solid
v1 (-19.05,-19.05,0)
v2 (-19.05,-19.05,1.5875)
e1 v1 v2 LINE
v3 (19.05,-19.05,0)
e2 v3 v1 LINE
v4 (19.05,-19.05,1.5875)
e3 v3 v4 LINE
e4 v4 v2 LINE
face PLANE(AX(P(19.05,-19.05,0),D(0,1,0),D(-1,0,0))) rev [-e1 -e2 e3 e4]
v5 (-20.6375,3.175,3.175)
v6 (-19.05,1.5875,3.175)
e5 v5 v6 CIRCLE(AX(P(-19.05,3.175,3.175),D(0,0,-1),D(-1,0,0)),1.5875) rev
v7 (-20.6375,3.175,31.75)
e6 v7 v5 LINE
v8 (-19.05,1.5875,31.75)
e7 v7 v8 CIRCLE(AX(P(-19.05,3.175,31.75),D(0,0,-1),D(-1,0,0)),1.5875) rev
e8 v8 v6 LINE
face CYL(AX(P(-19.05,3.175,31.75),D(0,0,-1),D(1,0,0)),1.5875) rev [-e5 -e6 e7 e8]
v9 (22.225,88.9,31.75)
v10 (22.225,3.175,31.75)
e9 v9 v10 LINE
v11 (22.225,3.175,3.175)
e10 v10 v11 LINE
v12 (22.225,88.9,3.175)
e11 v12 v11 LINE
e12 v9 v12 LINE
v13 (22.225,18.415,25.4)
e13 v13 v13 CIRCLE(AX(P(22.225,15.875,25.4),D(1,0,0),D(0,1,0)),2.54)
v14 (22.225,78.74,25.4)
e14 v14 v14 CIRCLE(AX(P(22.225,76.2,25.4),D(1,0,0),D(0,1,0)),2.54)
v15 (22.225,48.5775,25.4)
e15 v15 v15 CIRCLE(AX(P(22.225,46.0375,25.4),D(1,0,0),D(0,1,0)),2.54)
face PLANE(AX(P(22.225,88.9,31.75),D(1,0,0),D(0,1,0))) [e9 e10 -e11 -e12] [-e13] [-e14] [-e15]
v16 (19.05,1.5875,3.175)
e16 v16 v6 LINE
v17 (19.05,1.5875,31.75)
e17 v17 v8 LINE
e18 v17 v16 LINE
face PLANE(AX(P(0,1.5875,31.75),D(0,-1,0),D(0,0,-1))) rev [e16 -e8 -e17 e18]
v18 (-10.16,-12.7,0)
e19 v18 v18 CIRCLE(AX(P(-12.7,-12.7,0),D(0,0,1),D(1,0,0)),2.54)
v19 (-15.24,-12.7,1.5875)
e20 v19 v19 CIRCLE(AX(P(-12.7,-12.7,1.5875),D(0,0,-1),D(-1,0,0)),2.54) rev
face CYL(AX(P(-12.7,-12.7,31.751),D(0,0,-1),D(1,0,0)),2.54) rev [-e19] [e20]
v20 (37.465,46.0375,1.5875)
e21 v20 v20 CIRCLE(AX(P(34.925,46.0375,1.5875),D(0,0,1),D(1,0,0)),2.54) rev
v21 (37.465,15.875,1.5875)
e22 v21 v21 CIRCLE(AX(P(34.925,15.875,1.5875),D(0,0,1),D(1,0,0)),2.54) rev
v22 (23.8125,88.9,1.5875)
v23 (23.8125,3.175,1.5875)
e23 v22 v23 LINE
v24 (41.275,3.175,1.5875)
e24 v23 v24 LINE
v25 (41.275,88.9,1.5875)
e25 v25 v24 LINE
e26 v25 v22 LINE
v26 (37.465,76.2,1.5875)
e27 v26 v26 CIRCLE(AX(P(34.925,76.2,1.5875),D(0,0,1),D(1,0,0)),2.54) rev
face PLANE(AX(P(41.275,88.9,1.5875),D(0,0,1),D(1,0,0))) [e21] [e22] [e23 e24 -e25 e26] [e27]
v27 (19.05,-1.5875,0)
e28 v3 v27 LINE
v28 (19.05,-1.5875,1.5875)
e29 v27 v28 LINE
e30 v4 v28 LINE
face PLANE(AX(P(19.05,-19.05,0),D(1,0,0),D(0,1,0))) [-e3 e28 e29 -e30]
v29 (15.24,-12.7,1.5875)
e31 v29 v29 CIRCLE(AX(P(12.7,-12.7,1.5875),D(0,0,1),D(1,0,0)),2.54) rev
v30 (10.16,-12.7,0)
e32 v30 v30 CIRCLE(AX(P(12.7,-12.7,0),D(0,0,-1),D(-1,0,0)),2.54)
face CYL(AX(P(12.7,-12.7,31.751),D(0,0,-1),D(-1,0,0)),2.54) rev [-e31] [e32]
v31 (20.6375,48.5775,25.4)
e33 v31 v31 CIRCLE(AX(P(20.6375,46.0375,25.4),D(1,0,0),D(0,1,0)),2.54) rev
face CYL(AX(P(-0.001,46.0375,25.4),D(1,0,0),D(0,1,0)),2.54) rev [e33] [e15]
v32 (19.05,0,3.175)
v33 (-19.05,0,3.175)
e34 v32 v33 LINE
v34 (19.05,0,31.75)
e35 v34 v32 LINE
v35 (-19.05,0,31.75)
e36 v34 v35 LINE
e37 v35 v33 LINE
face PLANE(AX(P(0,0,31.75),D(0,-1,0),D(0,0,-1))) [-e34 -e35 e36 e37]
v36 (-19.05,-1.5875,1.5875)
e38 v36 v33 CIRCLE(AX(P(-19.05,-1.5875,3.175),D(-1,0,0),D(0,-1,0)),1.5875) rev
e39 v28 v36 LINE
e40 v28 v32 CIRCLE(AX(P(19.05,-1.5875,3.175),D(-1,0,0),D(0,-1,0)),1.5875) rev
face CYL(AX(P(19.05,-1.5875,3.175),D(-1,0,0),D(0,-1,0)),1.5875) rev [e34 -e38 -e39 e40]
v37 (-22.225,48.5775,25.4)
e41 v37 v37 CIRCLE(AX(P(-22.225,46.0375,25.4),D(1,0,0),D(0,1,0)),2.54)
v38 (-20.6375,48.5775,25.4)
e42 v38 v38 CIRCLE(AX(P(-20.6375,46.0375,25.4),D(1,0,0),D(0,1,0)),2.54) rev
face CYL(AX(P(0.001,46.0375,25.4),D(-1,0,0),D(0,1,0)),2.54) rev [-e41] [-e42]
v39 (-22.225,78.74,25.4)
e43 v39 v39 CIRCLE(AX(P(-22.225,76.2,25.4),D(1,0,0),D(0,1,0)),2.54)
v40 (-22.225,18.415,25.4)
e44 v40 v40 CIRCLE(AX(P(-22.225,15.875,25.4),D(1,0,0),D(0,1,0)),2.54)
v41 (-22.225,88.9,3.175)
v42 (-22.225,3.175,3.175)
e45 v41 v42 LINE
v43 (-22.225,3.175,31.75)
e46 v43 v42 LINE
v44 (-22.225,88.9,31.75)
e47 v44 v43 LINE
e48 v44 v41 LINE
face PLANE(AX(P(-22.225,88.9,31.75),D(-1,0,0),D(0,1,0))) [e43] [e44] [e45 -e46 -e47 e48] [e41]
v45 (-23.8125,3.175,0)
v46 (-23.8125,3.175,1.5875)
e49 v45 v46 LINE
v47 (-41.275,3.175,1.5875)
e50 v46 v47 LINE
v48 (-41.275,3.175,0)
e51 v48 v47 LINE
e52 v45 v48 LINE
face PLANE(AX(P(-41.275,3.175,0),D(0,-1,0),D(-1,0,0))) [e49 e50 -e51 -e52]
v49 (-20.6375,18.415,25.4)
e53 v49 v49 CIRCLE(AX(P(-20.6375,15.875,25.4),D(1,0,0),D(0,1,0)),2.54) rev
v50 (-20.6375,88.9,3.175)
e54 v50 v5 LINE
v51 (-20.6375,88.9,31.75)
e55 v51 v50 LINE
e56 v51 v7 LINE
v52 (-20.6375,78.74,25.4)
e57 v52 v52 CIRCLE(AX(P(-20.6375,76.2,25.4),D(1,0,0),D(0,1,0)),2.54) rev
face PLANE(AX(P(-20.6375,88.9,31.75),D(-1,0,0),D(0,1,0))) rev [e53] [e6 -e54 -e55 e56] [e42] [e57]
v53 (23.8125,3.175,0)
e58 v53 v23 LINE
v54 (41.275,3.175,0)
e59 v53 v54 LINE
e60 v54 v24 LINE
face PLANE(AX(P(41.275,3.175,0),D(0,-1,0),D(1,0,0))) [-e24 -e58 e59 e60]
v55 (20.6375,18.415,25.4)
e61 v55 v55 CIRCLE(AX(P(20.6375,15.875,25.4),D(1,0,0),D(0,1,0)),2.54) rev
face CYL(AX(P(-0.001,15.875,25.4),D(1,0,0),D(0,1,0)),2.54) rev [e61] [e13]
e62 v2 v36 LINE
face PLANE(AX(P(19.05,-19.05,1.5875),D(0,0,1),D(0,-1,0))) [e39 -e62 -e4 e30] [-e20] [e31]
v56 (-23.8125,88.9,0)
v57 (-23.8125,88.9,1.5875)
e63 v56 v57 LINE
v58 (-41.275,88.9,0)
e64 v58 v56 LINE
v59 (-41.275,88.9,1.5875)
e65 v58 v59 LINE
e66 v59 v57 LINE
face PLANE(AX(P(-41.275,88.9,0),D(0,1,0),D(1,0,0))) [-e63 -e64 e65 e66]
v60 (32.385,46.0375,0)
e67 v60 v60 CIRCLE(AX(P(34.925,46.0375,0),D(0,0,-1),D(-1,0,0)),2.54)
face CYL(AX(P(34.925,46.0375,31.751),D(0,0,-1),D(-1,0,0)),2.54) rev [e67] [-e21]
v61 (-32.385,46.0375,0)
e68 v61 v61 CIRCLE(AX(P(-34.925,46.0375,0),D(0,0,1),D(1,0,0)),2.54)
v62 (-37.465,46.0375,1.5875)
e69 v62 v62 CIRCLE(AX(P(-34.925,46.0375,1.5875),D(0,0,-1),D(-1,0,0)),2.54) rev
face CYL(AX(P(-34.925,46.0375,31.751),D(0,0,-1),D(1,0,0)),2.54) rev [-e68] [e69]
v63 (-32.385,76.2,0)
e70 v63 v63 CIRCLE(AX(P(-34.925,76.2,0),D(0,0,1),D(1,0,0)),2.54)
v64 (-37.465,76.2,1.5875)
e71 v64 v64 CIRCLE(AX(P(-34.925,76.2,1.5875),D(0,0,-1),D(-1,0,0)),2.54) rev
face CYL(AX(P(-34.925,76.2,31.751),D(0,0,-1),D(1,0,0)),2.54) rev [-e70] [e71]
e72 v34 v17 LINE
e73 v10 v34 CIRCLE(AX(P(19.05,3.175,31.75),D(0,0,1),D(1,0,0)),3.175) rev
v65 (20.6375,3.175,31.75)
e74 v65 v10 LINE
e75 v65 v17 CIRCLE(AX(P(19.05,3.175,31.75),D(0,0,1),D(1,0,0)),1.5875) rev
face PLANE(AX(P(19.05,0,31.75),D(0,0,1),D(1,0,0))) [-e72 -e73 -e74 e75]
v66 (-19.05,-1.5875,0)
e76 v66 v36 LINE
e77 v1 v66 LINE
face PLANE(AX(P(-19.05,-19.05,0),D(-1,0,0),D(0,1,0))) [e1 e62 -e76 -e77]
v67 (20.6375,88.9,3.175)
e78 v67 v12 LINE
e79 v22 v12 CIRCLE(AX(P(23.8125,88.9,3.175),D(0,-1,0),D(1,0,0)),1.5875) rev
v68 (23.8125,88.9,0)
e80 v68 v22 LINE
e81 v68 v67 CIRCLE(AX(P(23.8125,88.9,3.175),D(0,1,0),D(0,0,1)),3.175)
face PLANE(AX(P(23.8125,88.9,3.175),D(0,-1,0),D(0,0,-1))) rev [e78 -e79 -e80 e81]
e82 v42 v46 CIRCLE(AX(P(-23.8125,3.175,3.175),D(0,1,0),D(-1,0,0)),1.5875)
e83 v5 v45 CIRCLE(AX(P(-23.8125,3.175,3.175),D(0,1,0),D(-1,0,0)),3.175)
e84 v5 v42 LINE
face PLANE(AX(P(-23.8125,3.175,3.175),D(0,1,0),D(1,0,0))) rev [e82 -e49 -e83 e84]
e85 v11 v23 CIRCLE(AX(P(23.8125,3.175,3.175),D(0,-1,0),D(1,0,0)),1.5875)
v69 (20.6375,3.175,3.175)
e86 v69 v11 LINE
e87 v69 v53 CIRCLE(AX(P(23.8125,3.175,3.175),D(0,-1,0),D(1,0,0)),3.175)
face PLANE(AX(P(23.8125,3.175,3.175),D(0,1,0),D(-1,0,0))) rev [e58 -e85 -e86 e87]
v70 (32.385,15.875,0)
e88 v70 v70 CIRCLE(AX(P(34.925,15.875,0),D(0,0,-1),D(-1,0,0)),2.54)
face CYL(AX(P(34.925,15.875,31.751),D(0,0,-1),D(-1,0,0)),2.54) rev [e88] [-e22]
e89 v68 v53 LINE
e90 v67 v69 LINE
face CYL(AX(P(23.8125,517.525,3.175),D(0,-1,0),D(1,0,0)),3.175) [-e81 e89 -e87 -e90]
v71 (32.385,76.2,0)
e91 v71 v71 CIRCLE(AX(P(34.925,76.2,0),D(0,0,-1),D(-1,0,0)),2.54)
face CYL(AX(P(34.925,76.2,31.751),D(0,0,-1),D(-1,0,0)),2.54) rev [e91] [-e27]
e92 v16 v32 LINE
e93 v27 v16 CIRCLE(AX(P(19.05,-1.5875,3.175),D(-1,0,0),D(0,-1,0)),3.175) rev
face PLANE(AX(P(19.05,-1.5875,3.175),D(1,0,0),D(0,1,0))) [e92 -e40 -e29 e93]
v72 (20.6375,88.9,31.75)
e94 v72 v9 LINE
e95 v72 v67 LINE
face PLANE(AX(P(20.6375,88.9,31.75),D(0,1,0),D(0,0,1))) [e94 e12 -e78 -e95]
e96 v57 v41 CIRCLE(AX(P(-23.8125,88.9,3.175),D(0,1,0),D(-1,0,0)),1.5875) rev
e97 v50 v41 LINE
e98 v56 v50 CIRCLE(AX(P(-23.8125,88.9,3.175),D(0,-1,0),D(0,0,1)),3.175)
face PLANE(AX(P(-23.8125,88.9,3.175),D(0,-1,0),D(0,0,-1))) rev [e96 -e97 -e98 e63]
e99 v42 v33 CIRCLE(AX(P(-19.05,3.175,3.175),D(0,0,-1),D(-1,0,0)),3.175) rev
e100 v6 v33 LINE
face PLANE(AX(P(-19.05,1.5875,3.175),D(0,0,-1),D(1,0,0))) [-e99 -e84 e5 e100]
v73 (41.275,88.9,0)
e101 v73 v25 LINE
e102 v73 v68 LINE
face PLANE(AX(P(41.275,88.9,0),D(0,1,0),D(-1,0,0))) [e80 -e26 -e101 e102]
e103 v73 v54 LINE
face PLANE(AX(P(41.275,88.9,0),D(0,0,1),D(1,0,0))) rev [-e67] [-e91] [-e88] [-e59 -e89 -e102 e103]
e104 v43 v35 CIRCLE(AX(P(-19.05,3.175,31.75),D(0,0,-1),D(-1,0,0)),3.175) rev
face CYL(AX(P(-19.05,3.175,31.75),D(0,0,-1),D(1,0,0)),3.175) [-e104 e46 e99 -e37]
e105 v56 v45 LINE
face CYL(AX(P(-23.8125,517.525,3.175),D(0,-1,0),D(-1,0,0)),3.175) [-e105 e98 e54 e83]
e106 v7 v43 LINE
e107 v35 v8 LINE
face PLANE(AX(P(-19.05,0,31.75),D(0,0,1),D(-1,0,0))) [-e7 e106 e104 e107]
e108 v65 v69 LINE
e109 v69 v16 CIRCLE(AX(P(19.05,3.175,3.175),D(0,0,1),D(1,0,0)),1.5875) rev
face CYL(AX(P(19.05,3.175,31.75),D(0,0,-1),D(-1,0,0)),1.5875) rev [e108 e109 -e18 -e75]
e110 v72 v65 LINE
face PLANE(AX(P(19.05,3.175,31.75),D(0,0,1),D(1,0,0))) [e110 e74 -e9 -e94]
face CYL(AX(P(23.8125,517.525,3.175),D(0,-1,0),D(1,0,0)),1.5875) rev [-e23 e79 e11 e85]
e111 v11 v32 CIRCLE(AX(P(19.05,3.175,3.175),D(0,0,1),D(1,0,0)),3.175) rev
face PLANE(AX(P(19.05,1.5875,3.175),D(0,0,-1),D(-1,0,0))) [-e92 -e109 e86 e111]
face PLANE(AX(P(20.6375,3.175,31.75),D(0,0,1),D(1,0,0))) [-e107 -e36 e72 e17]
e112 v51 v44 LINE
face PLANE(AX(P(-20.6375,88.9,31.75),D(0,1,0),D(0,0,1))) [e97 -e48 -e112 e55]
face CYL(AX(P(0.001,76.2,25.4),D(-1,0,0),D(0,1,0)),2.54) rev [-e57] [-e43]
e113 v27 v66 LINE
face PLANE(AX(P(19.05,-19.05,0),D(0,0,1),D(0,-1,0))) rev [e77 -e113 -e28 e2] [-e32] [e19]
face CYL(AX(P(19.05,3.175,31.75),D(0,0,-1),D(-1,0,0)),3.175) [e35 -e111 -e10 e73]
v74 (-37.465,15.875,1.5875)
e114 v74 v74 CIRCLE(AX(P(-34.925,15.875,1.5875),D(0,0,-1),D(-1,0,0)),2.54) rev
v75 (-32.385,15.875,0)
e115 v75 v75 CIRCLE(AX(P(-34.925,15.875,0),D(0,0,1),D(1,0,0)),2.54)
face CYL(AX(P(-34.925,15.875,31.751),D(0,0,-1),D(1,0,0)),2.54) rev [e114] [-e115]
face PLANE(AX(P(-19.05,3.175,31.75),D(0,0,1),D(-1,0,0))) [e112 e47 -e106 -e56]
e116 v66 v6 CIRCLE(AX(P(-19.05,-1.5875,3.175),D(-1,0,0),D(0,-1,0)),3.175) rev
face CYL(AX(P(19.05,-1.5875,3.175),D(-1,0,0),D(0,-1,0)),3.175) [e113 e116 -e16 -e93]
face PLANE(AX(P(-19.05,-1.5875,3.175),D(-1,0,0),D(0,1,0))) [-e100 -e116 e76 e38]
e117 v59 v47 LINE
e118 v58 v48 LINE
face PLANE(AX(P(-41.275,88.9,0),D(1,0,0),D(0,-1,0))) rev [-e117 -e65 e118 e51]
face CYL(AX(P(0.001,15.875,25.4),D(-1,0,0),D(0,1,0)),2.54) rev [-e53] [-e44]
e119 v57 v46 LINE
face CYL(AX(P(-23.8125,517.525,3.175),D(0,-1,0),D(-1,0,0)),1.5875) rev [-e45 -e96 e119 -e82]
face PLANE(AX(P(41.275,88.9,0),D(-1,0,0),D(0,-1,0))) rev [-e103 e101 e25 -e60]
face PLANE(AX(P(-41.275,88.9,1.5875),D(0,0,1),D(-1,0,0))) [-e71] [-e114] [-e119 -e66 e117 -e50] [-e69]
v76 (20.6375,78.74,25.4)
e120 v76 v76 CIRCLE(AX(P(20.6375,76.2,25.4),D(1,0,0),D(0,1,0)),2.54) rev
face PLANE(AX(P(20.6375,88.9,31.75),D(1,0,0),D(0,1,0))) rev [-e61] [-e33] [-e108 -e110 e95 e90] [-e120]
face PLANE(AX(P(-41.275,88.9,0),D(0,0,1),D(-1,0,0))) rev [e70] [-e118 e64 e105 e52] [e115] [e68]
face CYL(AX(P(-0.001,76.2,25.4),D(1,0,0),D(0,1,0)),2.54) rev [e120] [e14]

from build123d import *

# Parameters (mm, degrees)
BASE_FLANGE_DEPTH         = 31.75
MITER_FLANGE2_DEPTH       = 88.9
MITER_FLANGE2_2_DEPTH     = 3.175
MITER_START               = 3.175
MITER_FLANGE2_3_DEPTH     = 85.725
MITER_START_2             = -19.05
MITER_FLANGE2_4_OUTLINE_W = 19.05
MITER_FLANGE2_4_OUTLINE_H = 1.5875
MITER_FLANGE2_4_DEPTH     = 17.4625
MITER_FLANGE2_5_DEPTH     = 19.05
MITER_FLANGE2_6_DEPTH     = 19.05
CUT_EXTRUDE1_REACH        = 105.029
SKETCH4_R                 = 2.54
CUT_EXTRUDE2_REACH        = 105.029
SKETCH5_R                 = 2.54
CUT_EXTRUDE4_REACH        = 107.049
SKETCH7_R                 = 2.54


with BuildPart() as part:
    # Base-Flange: sheet metal written as solids
    # Sketch1 → Base-Flange (new body)
    with BuildSketch(Plane.XY):
        with BuildLine():
            Line((0, 0), (19.05, 0))
            ThreePointArc((19.05, 0), (21.29506403, 0.92993597), (22.225, 3.175))
            Line((22.225, 3.175), (22.225, 88.9))
            Line((22.225, 88.9), (20.6375, 88.9))
            Line((20.6375, 88.9), (20.6375, 3.175))
            ThreePointArc((20.6375, 3.175), (20.172532015, 2.052467985), (19.05, 1.5875))
            Line((19.05, 1.5875), (0, 1.5875))
            Line((0, 1.5875), (0, 0))
        make_face()
    extrude(amount=BASE_FLANGE_DEPTH)

    # Miter Flange2: read off the stored shape, not the designer's step
    # Miter Flange2 outline → Miter Flange2 (cut)
    with BuildSketch(Plane(origin=(0, 0, 0), x_dir=(1, 0, 0), z_dir=(0, 1, 0))):
        with BuildLine():
            Line((22.225, 0), (19.05, 0))
            Line((19.05, 0), (19.05, -3.175))
            Line((19.05, -3.175), (20.6375, -3.175))
            ThreePointArc((20.6375, -3.175), (21.062869343, -1.5875), (22.225, -0.425369343))
            Line((22.225, -0.425369343), (22.225, 0))
        make_face()
    extrude(amount=MITER_FLANGE2_DEPTH, mode=Mode.SUBTRACT)

    # Miter Flange2 2 outline → Miter Flange2 2 (cut)
    with BuildSketch(Plane(origin=(0, 0, 0), x_dir=(1, 0, 0), z_dir=(0, 1, 0))):
        with BuildLine():
            Line((20.6375, -3.175), (22.225, -3.175))
            Line((22.225, -3.175), (22.225, -0.425369343))
            ThreePointArc((22.225, -0.425369343), (21.062869343, -1.5875), (20.6375, -3.175))
        make_face()
    extrude(amount=MITER_FLANGE2_2_DEPTH, mode=Mode.SUBTRACT)

    # Miter Flange2 3 outline → Miter Flange2 3 (add)
    with BuildSketch(Plane(origin=(0, 0, 0), x_dir=(1, 0, 0), z_dir=(0, 1, 0)).offset(MITER_START)):
        with BuildLine():
            Line((22.225, -0.425369343), (22.225, -3.175))
            ThreePointArc((22.225, -3.175), (22.689967985, -2.052467985), (23.8125, -1.5875))
            Line((23.8125, -1.5875), (41.275, -1.5875))
            Line((41.275, -1.5875), (41.275, 0))
            Line((41.275, 0), (23.8125, 0))
            ThreePointArc((23.8125, 0), (22.990749532, -0.108185502), (22.225, -0.425369343))
        make_face()
    extrude(amount=MITER_FLANGE2_3_DEPTH)

    # Miter Flange2 5 outline → Miter Flange2 5 (cut)
    with BuildSketch(Plane.YZ):
        with BuildLine():
            ThreePointArc((1.5875, 3.175), (1.162130657, 1.5875), (0, 0.425369343))
            Line((0, 0.425369343), (0, 0))
            Line((0, 0), (1.5875, 0))
            Line((1.5875, 0), (1.5875, 3.175))
        make_face()
    extrude(amount=MITER_FLANGE2_5_DEPTH, mode=Mode.SUBTRACT)



with BuildPart() as body_2:
    # Miter Flange2 4 outline → Miter Flange2 4 (new body)
    with BuildSketch(Plane(origin=(0, 0, 0), x_dir=(1, 0, 0), z_dir=(0, 1, 0)).offset(MITER_START_2)):
        with Locations((9.525, -0.79375)):
            Rectangle(MITER_FLANGE2_4_OUTLINE_W, MITER_FLANGE2_4_OUTLINE_H)
    extrude(amount=MITER_FLANGE2_4_DEPTH)


with BuildPart() as part_1:
    add(part.part)

    add(body_2.part)  # Miter Flange2 6 merges body 2
    # Miter Flange2 6 outline → Miter Flange2 6 (add)
    with BuildSketch(Plane.YZ):
        with BuildLine():
            Line((0, 0.425369343), (0, 3.175))
            ThreePointArc((0, 3.175), (-0.464967985, 2.052467985), (-1.5875, 1.5875))
            Line((-1.5875, 1.5875), (-1.5875, 0))
            ThreePointArc((-1.5875, 0), (-0.765749532, 0.108185502), (0, 0.425369343))
        make_face()
    extrude(amount=MITER_FLANGE2_6_DEPTH)

    # Sketch4 → Cut-Extrude1 (cut, up to next)
    with BuildSketch(Plane(origin=(0, 0, 0), x_dir=(-1, 0, 0), z_dir=(0, 0, -1)), mode=Mode.PRIVATE) as cut_extrude1_sk1:
        with Locations((-34.925, 76.2)):
            Circle(SKETCH4_R)
    cut_extrude1_tool1 = extrude(cut_extrude1_sk1.sketch, amount=-CUT_EXTRUDE1_REACH, mode=Mode.PRIVATE) & part_1.part
    # Sketch4 → Cut-Extrude1 (cut, up to next)
    with BuildSketch(Plane(origin=(0, 0, 0), x_dir=(-1, 0, 0), z_dir=(0, 0, -1)), mode=Mode.PRIVATE) as cut_extrude1_sk2:
        with Locations((-34.925, 46.0375)):
            Circle(SKETCH4_R)
    cut_extrude1_tool2 = extrude(cut_extrude1_sk2.sketch, amount=-CUT_EXTRUDE1_REACH, mode=Mode.PRIVATE) & part_1.part
    # Sketch4 → Cut-Extrude1 (cut, up to next)
    with BuildSketch(Plane(origin=(0, 0, 0), x_dir=(-1, 0, 0), z_dir=(0, 0, -1)), mode=Mode.PRIVATE) as cut_extrude1_sk3:
        with Locations((-34.925, 15.875)):
            Circle(SKETCH4_R)
    cut_extrude1_tool3 = extrude(cut_extrude1_sk3.sketch, amount=-CUT_EXTRUDE1_REACH, mode=Mode.PRIVATE) & part_1.part
    add(cut_extrude1_tool1.solids().sort_by_distance((34.925, 76.2, 0))[0], mode=Mode.SUBTRACT)
    add(cut_extrude1_tool2.solids().sort_by_distance((34.925, 46.0375, 0))[0], mode=Mode.SUBTRACT)
    add(cut_extrude1_tool3.solids().sort_by_distance((34.925, 15.875, 0))[0], mode=Mode.SUBTRACT)

    # Sketch5 → Cut-Extrude2 (cut, up to next)
    with BuildSketch(Plane(origin=(0, 0, 0), x_dir=(-1, 0, 0), z_dir=(0, 0, -1)), mode=Mode.PRIVATE) as cut_extrude2_sk1:
        with Locations((-12.7, -12.7)):
            Circle(SKETCH5_R)
    cut_extrude2_tool1 = extrude(cut_extrude2_sk1.sketch, amount=-CUT_EXTRUDE2_REACH, mode=Mode.PRIVATE) & part_1.part
    add(cut_extrude2_tool1.solids().sort_by_distance((12.7, -12.7, 0))[0], mode=Mode.SUBTRACT)

    # Sketch7 → Cut-Extrude4 (cut, up to next)
    with BuildSketch(Plane(origin=(22.225, -0.213353633, 50.991788494), x_dir=(0, 0, -1), z_dir=(1, 0, 0)), mode=Mode.PRIVATE) as cut_extrude4_sk1:
        with Locations(Location((25.591788494, 76.413353633, 0), (0, 0, 90))):
            Circle(SKETCH7_R)
    cut_extrude4_tool1 = extrude(cut_extrude4_sk1.sketch, amount=-CUT_EXTRUDE4_REACH, mode=Mode.PRIVATE) & part_1.part
    # Sketch7 → Cut-Extrude4 (cut, up to next)
    with BuildSketch(Plane(origin=(22.225, -0.213353633, 50.991788494), x_dir=(0, 0, -1), z_dir=(1, 0, 0)), mode=Mode.PRIVATE) as cut_extrude4_sk2:
        with Locations(Location((25.591788494, 46.250853633, 0), (0, 0, 90))):
            Circle(SKETCH7_R)
    cut_extrude4_tool2 = extrude(cut_extrude4_sk2.sketch, amount=-CUT_EXTRUDE4_REACH, mode=Mode.PRIVATE) & part_1.part
    # Sketch7 → Cut-Extrude4 (cut, up to next)
    with BuildSketch(Plane(origin=(22.225, -0.213353633, 50.991788494), x_dir=(0, 0, -1), z_dir=(1, 0, 0)), mode=Mode.PRIVATE) as cut_extrude4_sk3:
        with Locations(Location((25.591788494, 16.088353633, 0), (0, 0, 90))):
            Circle(SKETCH7_R)
    cut_extrude4_tool3 = extrude(cut_extrude4_sk3.sketch, amount=-CUT_EXTRUDE4_REACH, mode=Mode.PRIVATE) & part_1.part
    add(cut_extrude4_tool1.solids().sort_by_distance((22.225, 76.2, 25.4))[0], mode=Mode.SUBTRACT)
    add(cut_extrude4_tool2.solids().sort_by_distance((22.225, 46.0375, 25.4))[0], mode=Mode.SUBTRACT)
    add(cut_extrude4_tool3.solids().sort_by_distance((22.225, 15.875, 25.4))[0], mode=Mode.SUBTRACT)

    # SHM-Mirror1: part across plane


with BuildPart() as part_2:
    add(part_1.part)
    add(part_1.part.mirror(Plane(origin=(0, 0, 31.75), x_dir=(0, 0, 1), z_dir=(-1, 0, 0))))


solid = part_2.part
